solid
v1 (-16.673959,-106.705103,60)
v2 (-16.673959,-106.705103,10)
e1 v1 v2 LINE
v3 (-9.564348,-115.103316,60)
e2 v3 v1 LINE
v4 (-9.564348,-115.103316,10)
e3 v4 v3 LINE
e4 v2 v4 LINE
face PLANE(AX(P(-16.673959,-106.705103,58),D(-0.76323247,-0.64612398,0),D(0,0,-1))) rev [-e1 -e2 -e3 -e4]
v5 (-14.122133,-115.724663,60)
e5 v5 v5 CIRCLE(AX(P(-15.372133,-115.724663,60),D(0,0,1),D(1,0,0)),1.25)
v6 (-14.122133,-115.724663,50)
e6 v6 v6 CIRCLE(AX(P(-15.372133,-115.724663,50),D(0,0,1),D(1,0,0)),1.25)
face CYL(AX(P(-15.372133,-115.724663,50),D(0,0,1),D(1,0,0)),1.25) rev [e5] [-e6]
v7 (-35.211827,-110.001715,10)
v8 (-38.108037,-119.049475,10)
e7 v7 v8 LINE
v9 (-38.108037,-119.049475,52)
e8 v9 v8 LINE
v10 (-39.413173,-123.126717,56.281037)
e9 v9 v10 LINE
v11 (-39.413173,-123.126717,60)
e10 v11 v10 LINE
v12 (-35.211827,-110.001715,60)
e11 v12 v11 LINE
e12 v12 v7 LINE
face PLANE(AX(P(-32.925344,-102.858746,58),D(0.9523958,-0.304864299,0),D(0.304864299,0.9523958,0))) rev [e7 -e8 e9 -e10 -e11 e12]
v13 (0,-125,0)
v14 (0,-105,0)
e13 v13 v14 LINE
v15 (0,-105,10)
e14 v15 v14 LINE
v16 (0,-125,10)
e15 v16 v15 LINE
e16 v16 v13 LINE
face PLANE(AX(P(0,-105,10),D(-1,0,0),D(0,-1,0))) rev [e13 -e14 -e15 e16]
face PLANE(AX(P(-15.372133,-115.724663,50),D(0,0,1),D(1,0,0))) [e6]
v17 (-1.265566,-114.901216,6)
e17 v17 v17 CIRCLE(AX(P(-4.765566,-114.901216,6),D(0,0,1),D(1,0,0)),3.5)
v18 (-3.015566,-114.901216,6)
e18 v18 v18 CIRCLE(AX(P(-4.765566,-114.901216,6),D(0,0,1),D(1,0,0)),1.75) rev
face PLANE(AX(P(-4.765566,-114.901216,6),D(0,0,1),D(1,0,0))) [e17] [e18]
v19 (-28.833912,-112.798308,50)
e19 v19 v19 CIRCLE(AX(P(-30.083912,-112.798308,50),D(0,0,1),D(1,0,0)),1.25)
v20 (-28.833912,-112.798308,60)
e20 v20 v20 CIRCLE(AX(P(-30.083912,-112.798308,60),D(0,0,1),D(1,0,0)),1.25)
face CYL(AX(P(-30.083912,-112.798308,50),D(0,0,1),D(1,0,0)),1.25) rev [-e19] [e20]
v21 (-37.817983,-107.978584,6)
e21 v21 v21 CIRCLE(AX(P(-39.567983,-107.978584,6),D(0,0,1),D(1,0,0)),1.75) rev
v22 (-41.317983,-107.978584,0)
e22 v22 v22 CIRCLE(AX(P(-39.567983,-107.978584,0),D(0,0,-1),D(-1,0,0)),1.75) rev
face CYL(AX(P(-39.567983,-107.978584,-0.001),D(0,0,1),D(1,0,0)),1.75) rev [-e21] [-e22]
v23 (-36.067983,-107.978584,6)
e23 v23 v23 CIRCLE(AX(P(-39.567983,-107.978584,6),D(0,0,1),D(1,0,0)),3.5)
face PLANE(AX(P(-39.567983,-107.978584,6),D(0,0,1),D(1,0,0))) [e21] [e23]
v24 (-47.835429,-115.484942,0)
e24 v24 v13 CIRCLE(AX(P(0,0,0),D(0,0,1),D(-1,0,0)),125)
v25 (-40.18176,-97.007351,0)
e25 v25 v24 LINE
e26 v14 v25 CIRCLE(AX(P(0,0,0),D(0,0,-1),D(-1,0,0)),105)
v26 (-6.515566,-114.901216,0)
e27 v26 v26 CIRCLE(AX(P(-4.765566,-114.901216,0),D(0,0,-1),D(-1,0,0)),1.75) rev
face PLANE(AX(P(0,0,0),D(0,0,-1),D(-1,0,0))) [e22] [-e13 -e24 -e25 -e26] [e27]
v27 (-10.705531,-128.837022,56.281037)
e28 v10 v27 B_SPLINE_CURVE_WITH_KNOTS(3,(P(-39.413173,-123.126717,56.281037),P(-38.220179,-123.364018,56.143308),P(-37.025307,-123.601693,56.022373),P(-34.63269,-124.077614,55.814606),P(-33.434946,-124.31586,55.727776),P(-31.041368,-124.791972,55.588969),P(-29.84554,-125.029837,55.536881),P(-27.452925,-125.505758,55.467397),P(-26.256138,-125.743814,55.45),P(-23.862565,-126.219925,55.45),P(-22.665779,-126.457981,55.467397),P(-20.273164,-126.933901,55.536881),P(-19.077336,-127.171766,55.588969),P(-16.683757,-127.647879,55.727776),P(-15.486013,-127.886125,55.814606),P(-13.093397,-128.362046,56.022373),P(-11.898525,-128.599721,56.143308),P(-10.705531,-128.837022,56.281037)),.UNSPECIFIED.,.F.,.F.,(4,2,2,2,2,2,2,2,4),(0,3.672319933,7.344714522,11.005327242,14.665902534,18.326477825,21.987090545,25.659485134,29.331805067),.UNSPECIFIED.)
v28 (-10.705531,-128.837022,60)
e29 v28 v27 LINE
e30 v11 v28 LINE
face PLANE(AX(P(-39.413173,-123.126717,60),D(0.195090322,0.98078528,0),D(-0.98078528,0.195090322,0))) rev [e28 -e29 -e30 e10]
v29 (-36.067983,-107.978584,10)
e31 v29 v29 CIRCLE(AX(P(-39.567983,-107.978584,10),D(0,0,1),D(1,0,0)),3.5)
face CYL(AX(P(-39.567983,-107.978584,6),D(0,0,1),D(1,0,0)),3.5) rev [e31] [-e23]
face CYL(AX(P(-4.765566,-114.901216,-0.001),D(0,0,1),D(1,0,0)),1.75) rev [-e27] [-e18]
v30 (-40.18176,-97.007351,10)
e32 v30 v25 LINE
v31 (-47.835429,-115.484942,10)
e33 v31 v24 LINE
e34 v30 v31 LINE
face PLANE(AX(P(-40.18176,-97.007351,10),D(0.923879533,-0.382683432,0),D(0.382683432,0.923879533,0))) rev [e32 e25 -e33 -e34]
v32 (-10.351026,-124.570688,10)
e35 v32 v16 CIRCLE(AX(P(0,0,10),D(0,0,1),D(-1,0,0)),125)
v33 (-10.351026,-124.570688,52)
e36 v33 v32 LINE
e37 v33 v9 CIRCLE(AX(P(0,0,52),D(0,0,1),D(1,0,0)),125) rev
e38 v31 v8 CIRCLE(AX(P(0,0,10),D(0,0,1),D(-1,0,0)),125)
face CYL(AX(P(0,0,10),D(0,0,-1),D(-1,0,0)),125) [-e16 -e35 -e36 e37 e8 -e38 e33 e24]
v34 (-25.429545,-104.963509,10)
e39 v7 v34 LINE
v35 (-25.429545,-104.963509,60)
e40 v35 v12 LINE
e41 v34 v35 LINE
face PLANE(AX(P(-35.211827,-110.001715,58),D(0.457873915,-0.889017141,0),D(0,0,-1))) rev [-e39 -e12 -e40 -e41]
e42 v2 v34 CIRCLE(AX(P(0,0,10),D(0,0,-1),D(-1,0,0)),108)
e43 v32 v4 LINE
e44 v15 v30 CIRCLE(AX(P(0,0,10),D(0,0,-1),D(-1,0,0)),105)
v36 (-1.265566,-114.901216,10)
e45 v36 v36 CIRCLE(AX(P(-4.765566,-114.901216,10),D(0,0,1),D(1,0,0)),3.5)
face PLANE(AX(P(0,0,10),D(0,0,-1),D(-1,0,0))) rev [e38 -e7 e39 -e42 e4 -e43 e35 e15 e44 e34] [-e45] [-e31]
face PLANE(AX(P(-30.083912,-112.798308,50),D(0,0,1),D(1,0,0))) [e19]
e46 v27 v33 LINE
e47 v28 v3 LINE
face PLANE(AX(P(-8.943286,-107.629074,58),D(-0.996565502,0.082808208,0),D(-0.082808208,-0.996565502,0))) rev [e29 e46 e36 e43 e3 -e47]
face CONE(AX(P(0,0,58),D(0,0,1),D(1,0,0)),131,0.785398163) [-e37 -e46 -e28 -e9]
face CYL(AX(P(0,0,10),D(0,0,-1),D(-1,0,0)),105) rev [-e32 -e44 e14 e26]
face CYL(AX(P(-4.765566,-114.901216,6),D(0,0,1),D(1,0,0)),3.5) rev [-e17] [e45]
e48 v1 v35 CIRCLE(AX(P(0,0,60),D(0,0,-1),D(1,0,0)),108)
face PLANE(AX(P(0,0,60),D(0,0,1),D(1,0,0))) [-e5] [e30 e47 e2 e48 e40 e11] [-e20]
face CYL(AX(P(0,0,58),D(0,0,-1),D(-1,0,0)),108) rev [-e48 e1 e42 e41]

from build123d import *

# Parameters (mm, degrees)
BOSS_EXTRU_1_DEPTH      = 10
BOSS_EXTRU_2_DEPTH      = 48
BOSS_EXTRU_3_DEPTH      = 2
CHANFREIN1_SIZE         = 6
ENL_V_MAT_EXTRU_1_REACH = 148.244
ESQUISSE5_R             = 1.75
ESQUISSE6_R             = 3.5
ENL_V_MAT_EXTRU_2_DEPTH = 4
CHANFREIN2_SIZE         = 7.5
ESQUISSE7_R             = 1.25
ENL_V_MAT_EXTRU_3_DEPTH = 10


with BuildPart() as part:
    # Esquisse1 → Boss.-Extru.1 (new body)
    with BuildSketch(Plane.XY):
        with BuildLine():
            Line((-40.181760398, -97.007350914), (-47.835429046, -115.484941564))
            ThreePointArc((-47.835429046, -115.484941564), (-24.386290252, -122.59816005), (0, -125))
            Line((0, -125), (0, -105))
            ThreePointArc((0, -105), (-20.484483812, -102.982454442), (-40.181760398, -97.007350914))
        make_face()
    extrude(amount=BOSS_EXTRU_1_DEPTH)

    # Esquisse2 → Boss.-Extru.2 (add)
    with BuildSketch(Plane.XY.offset(10)):
        with BuildLine():
            Line((-32.925344295, -102.858746361), (-38.108037379, -119.049474955))
            ThreePointArc((-38.108037379, -119.049474955), (-24.386290252, -122.59816005), (-10.351025939, -124.570687812))
            Line((-10.351025939, -124.570687812), (-8.943286411, -107.62907427))
            ThreePointArc((-8.943286411, -107.62907427), (-21.069754778, -105.924810284), (-32.925344295, -102.858746361))
        make_face()
    extrude(amount=BOSS_EXTRU_2_DEPTH)

    # Esquisse4 → Boss.-Extru.3 (add)
    with BuildSketch(Plane.XY.offset(58)):
        with BuildLine():
            Line((-39.413172773, -123.12671677), (-10.705530953, -128.837021766))
            Line((-10.705530953, -128.837021766), (-8.943286411, -107.62907427))
            ThreePointArc((-8.943286411, -107.62907427), (-21.069754778, -105.924810284), (-32.925344295, -102.858746361))
            Line((-32.925344295, -102.858746361), (-39.413172773, -123.12671677))
        make_face()
    extrude(amount=BOSS_EXTRU_3_DEPTH)

    # Chanfrein1
    # the kernel refuses this chamfer: 6 mm, written as the material it adds along each edge
    with BuildSketch(Plane(origin=(0, 0, 58), x_dir=(-0.3048642990280114, -0.9523957996432781, 0), z_dir=(-0.9523957996432781, 0.3048642990280114, 0))) as chanfrein1_piece_1_section:
        Polygon((125 + CHANFREIN1_SIZE, 0), (125, -CHANFREIN1_SIZE), (125, 0), align=None)
    chanfrein1_piece_1 = revolve(axis=Axis((0, 0, 58), (0, 0, 1)), revolution_arc=13, mode=Mode.PRIVATE)
    chanfrein1_piece_1 = split(chanfrein1_piece_1, bisect_by=Plane(origin=(-25.059351863, -125.981869268, 58), z_dir=(0.19509032201612828, 0.9807852804032304, 0)), keep=Keep.TOP, mode=Mode.PRIVATE)
    add(chanfrein1_piece_1)

    # Esquisse5 → Enlèv. mat.-Extru.1 (cut, up to next)
    with BuildSketch(Plane.XY.offset(10), mode=Mode.PRIVATE) as enl_v_mat_extru_1_sk1:
        with Locations((-4.765565521, -114.901215769)):
            Circle(ESQUISSE5_R)
    enl_v_mat_extru_1_tool1 = extrude(enl_v_mat_extru_1_sk1.sketch, amount=-ENL_V_MAT_EXTRU_1_REACH, mode=Mode.PRIVATE) & part.part
    # Esquisse5 → Enlèv. mat.-Extru.1 (cut, up to next)
    with BuildSketch(Plane.XY.offset(10), mode=Mode.PRIVATE) as enl_v_mat_extru_1_sk2:
        with Locations((-39.567983188, -107.978584481)):
            Circle(ESQUISSE5_R)
    enl_v_mat_extru_1_tool2 = extrude(enl_v_mat_extru_1_sk2.sketch, amount=-ENL_V_MAT_EXTRU_1_REACH, mode=Mode.PRIVATE) & part.part
    add(enl_v_mat_extru_1_tool1.solids().sort_by_distance((-4.765566, -114.901216, 10))[0], mode=Mode.SUBTRACT)
    add(enl_v_mat_extru_1_tool2.solids().sort_by_distance((-39.567983, -107.978584, 10))[0], mode=Mode.SUBTRACT)

    # Esquisse6 → Enlèv. mat.-Extru.2 (cut)
    with BuildSketch(Plane.XY.offset(10)):
        with Locations((-39.567983188, -107.978584481)):
            Circle(ESQUISSE6_R)
        with Locations((-4.765565521, -114.901215769)):
            Circle(ESQUISSE6_R)
    extrude(amount=-ENL_V_MAT_EXTRU_2_DEPTH, mode=Mode.SUBTRACT)

    # Chanfrein2
    # the kernel refuses this chamfer: 7.5 mm, written as the material it takes off along each edge
    with BuildSketch(Plane(origin=(-8.943286411, -107.62907427, 10), x_dir=(-0.08280820751335238, -0.996565502497666, 0), z_dir=(0, 0, 1)), Plane(origin=(-32.925344295, -102.858746361, 80.019854797), x_dir=(-0.3048642990290983, -0.9523957996429303, 0), z_dir=(0, 0, -1))) as chanfrein2_piece_1:
        with BuildLine():
            Line((CHANFREIN2_SIZE, 0), (-0.280634385, -7.780634385))
            ThreePointArc((-0.280634385, -7.780634385), (-0.074202159, -4.002769088), (0, 0))
            Line((0, 0), (CHANFREIN2_SIZE, 0))
        make_face()
    extrude(amount=70.019854797, mode=Mode.SUBTRACT)

    # Esquisse7 → Enlèv. mat.-Extru.3 (cut)
    with BuildSketch(Plane.XY.offset(60)):
        with Locations((-30.083912118, -112.798307752)):
            Circle(ESQUISSE7_R)
        with Locations((-15.372132912, -115.724662582)):
            Circle(ESQUISSE7_R)
    extrude(amount=-ENL_V_MAT_EXTRU_3_DEPTH, mode=Mode.SUBTRACT)


solid = part.part
